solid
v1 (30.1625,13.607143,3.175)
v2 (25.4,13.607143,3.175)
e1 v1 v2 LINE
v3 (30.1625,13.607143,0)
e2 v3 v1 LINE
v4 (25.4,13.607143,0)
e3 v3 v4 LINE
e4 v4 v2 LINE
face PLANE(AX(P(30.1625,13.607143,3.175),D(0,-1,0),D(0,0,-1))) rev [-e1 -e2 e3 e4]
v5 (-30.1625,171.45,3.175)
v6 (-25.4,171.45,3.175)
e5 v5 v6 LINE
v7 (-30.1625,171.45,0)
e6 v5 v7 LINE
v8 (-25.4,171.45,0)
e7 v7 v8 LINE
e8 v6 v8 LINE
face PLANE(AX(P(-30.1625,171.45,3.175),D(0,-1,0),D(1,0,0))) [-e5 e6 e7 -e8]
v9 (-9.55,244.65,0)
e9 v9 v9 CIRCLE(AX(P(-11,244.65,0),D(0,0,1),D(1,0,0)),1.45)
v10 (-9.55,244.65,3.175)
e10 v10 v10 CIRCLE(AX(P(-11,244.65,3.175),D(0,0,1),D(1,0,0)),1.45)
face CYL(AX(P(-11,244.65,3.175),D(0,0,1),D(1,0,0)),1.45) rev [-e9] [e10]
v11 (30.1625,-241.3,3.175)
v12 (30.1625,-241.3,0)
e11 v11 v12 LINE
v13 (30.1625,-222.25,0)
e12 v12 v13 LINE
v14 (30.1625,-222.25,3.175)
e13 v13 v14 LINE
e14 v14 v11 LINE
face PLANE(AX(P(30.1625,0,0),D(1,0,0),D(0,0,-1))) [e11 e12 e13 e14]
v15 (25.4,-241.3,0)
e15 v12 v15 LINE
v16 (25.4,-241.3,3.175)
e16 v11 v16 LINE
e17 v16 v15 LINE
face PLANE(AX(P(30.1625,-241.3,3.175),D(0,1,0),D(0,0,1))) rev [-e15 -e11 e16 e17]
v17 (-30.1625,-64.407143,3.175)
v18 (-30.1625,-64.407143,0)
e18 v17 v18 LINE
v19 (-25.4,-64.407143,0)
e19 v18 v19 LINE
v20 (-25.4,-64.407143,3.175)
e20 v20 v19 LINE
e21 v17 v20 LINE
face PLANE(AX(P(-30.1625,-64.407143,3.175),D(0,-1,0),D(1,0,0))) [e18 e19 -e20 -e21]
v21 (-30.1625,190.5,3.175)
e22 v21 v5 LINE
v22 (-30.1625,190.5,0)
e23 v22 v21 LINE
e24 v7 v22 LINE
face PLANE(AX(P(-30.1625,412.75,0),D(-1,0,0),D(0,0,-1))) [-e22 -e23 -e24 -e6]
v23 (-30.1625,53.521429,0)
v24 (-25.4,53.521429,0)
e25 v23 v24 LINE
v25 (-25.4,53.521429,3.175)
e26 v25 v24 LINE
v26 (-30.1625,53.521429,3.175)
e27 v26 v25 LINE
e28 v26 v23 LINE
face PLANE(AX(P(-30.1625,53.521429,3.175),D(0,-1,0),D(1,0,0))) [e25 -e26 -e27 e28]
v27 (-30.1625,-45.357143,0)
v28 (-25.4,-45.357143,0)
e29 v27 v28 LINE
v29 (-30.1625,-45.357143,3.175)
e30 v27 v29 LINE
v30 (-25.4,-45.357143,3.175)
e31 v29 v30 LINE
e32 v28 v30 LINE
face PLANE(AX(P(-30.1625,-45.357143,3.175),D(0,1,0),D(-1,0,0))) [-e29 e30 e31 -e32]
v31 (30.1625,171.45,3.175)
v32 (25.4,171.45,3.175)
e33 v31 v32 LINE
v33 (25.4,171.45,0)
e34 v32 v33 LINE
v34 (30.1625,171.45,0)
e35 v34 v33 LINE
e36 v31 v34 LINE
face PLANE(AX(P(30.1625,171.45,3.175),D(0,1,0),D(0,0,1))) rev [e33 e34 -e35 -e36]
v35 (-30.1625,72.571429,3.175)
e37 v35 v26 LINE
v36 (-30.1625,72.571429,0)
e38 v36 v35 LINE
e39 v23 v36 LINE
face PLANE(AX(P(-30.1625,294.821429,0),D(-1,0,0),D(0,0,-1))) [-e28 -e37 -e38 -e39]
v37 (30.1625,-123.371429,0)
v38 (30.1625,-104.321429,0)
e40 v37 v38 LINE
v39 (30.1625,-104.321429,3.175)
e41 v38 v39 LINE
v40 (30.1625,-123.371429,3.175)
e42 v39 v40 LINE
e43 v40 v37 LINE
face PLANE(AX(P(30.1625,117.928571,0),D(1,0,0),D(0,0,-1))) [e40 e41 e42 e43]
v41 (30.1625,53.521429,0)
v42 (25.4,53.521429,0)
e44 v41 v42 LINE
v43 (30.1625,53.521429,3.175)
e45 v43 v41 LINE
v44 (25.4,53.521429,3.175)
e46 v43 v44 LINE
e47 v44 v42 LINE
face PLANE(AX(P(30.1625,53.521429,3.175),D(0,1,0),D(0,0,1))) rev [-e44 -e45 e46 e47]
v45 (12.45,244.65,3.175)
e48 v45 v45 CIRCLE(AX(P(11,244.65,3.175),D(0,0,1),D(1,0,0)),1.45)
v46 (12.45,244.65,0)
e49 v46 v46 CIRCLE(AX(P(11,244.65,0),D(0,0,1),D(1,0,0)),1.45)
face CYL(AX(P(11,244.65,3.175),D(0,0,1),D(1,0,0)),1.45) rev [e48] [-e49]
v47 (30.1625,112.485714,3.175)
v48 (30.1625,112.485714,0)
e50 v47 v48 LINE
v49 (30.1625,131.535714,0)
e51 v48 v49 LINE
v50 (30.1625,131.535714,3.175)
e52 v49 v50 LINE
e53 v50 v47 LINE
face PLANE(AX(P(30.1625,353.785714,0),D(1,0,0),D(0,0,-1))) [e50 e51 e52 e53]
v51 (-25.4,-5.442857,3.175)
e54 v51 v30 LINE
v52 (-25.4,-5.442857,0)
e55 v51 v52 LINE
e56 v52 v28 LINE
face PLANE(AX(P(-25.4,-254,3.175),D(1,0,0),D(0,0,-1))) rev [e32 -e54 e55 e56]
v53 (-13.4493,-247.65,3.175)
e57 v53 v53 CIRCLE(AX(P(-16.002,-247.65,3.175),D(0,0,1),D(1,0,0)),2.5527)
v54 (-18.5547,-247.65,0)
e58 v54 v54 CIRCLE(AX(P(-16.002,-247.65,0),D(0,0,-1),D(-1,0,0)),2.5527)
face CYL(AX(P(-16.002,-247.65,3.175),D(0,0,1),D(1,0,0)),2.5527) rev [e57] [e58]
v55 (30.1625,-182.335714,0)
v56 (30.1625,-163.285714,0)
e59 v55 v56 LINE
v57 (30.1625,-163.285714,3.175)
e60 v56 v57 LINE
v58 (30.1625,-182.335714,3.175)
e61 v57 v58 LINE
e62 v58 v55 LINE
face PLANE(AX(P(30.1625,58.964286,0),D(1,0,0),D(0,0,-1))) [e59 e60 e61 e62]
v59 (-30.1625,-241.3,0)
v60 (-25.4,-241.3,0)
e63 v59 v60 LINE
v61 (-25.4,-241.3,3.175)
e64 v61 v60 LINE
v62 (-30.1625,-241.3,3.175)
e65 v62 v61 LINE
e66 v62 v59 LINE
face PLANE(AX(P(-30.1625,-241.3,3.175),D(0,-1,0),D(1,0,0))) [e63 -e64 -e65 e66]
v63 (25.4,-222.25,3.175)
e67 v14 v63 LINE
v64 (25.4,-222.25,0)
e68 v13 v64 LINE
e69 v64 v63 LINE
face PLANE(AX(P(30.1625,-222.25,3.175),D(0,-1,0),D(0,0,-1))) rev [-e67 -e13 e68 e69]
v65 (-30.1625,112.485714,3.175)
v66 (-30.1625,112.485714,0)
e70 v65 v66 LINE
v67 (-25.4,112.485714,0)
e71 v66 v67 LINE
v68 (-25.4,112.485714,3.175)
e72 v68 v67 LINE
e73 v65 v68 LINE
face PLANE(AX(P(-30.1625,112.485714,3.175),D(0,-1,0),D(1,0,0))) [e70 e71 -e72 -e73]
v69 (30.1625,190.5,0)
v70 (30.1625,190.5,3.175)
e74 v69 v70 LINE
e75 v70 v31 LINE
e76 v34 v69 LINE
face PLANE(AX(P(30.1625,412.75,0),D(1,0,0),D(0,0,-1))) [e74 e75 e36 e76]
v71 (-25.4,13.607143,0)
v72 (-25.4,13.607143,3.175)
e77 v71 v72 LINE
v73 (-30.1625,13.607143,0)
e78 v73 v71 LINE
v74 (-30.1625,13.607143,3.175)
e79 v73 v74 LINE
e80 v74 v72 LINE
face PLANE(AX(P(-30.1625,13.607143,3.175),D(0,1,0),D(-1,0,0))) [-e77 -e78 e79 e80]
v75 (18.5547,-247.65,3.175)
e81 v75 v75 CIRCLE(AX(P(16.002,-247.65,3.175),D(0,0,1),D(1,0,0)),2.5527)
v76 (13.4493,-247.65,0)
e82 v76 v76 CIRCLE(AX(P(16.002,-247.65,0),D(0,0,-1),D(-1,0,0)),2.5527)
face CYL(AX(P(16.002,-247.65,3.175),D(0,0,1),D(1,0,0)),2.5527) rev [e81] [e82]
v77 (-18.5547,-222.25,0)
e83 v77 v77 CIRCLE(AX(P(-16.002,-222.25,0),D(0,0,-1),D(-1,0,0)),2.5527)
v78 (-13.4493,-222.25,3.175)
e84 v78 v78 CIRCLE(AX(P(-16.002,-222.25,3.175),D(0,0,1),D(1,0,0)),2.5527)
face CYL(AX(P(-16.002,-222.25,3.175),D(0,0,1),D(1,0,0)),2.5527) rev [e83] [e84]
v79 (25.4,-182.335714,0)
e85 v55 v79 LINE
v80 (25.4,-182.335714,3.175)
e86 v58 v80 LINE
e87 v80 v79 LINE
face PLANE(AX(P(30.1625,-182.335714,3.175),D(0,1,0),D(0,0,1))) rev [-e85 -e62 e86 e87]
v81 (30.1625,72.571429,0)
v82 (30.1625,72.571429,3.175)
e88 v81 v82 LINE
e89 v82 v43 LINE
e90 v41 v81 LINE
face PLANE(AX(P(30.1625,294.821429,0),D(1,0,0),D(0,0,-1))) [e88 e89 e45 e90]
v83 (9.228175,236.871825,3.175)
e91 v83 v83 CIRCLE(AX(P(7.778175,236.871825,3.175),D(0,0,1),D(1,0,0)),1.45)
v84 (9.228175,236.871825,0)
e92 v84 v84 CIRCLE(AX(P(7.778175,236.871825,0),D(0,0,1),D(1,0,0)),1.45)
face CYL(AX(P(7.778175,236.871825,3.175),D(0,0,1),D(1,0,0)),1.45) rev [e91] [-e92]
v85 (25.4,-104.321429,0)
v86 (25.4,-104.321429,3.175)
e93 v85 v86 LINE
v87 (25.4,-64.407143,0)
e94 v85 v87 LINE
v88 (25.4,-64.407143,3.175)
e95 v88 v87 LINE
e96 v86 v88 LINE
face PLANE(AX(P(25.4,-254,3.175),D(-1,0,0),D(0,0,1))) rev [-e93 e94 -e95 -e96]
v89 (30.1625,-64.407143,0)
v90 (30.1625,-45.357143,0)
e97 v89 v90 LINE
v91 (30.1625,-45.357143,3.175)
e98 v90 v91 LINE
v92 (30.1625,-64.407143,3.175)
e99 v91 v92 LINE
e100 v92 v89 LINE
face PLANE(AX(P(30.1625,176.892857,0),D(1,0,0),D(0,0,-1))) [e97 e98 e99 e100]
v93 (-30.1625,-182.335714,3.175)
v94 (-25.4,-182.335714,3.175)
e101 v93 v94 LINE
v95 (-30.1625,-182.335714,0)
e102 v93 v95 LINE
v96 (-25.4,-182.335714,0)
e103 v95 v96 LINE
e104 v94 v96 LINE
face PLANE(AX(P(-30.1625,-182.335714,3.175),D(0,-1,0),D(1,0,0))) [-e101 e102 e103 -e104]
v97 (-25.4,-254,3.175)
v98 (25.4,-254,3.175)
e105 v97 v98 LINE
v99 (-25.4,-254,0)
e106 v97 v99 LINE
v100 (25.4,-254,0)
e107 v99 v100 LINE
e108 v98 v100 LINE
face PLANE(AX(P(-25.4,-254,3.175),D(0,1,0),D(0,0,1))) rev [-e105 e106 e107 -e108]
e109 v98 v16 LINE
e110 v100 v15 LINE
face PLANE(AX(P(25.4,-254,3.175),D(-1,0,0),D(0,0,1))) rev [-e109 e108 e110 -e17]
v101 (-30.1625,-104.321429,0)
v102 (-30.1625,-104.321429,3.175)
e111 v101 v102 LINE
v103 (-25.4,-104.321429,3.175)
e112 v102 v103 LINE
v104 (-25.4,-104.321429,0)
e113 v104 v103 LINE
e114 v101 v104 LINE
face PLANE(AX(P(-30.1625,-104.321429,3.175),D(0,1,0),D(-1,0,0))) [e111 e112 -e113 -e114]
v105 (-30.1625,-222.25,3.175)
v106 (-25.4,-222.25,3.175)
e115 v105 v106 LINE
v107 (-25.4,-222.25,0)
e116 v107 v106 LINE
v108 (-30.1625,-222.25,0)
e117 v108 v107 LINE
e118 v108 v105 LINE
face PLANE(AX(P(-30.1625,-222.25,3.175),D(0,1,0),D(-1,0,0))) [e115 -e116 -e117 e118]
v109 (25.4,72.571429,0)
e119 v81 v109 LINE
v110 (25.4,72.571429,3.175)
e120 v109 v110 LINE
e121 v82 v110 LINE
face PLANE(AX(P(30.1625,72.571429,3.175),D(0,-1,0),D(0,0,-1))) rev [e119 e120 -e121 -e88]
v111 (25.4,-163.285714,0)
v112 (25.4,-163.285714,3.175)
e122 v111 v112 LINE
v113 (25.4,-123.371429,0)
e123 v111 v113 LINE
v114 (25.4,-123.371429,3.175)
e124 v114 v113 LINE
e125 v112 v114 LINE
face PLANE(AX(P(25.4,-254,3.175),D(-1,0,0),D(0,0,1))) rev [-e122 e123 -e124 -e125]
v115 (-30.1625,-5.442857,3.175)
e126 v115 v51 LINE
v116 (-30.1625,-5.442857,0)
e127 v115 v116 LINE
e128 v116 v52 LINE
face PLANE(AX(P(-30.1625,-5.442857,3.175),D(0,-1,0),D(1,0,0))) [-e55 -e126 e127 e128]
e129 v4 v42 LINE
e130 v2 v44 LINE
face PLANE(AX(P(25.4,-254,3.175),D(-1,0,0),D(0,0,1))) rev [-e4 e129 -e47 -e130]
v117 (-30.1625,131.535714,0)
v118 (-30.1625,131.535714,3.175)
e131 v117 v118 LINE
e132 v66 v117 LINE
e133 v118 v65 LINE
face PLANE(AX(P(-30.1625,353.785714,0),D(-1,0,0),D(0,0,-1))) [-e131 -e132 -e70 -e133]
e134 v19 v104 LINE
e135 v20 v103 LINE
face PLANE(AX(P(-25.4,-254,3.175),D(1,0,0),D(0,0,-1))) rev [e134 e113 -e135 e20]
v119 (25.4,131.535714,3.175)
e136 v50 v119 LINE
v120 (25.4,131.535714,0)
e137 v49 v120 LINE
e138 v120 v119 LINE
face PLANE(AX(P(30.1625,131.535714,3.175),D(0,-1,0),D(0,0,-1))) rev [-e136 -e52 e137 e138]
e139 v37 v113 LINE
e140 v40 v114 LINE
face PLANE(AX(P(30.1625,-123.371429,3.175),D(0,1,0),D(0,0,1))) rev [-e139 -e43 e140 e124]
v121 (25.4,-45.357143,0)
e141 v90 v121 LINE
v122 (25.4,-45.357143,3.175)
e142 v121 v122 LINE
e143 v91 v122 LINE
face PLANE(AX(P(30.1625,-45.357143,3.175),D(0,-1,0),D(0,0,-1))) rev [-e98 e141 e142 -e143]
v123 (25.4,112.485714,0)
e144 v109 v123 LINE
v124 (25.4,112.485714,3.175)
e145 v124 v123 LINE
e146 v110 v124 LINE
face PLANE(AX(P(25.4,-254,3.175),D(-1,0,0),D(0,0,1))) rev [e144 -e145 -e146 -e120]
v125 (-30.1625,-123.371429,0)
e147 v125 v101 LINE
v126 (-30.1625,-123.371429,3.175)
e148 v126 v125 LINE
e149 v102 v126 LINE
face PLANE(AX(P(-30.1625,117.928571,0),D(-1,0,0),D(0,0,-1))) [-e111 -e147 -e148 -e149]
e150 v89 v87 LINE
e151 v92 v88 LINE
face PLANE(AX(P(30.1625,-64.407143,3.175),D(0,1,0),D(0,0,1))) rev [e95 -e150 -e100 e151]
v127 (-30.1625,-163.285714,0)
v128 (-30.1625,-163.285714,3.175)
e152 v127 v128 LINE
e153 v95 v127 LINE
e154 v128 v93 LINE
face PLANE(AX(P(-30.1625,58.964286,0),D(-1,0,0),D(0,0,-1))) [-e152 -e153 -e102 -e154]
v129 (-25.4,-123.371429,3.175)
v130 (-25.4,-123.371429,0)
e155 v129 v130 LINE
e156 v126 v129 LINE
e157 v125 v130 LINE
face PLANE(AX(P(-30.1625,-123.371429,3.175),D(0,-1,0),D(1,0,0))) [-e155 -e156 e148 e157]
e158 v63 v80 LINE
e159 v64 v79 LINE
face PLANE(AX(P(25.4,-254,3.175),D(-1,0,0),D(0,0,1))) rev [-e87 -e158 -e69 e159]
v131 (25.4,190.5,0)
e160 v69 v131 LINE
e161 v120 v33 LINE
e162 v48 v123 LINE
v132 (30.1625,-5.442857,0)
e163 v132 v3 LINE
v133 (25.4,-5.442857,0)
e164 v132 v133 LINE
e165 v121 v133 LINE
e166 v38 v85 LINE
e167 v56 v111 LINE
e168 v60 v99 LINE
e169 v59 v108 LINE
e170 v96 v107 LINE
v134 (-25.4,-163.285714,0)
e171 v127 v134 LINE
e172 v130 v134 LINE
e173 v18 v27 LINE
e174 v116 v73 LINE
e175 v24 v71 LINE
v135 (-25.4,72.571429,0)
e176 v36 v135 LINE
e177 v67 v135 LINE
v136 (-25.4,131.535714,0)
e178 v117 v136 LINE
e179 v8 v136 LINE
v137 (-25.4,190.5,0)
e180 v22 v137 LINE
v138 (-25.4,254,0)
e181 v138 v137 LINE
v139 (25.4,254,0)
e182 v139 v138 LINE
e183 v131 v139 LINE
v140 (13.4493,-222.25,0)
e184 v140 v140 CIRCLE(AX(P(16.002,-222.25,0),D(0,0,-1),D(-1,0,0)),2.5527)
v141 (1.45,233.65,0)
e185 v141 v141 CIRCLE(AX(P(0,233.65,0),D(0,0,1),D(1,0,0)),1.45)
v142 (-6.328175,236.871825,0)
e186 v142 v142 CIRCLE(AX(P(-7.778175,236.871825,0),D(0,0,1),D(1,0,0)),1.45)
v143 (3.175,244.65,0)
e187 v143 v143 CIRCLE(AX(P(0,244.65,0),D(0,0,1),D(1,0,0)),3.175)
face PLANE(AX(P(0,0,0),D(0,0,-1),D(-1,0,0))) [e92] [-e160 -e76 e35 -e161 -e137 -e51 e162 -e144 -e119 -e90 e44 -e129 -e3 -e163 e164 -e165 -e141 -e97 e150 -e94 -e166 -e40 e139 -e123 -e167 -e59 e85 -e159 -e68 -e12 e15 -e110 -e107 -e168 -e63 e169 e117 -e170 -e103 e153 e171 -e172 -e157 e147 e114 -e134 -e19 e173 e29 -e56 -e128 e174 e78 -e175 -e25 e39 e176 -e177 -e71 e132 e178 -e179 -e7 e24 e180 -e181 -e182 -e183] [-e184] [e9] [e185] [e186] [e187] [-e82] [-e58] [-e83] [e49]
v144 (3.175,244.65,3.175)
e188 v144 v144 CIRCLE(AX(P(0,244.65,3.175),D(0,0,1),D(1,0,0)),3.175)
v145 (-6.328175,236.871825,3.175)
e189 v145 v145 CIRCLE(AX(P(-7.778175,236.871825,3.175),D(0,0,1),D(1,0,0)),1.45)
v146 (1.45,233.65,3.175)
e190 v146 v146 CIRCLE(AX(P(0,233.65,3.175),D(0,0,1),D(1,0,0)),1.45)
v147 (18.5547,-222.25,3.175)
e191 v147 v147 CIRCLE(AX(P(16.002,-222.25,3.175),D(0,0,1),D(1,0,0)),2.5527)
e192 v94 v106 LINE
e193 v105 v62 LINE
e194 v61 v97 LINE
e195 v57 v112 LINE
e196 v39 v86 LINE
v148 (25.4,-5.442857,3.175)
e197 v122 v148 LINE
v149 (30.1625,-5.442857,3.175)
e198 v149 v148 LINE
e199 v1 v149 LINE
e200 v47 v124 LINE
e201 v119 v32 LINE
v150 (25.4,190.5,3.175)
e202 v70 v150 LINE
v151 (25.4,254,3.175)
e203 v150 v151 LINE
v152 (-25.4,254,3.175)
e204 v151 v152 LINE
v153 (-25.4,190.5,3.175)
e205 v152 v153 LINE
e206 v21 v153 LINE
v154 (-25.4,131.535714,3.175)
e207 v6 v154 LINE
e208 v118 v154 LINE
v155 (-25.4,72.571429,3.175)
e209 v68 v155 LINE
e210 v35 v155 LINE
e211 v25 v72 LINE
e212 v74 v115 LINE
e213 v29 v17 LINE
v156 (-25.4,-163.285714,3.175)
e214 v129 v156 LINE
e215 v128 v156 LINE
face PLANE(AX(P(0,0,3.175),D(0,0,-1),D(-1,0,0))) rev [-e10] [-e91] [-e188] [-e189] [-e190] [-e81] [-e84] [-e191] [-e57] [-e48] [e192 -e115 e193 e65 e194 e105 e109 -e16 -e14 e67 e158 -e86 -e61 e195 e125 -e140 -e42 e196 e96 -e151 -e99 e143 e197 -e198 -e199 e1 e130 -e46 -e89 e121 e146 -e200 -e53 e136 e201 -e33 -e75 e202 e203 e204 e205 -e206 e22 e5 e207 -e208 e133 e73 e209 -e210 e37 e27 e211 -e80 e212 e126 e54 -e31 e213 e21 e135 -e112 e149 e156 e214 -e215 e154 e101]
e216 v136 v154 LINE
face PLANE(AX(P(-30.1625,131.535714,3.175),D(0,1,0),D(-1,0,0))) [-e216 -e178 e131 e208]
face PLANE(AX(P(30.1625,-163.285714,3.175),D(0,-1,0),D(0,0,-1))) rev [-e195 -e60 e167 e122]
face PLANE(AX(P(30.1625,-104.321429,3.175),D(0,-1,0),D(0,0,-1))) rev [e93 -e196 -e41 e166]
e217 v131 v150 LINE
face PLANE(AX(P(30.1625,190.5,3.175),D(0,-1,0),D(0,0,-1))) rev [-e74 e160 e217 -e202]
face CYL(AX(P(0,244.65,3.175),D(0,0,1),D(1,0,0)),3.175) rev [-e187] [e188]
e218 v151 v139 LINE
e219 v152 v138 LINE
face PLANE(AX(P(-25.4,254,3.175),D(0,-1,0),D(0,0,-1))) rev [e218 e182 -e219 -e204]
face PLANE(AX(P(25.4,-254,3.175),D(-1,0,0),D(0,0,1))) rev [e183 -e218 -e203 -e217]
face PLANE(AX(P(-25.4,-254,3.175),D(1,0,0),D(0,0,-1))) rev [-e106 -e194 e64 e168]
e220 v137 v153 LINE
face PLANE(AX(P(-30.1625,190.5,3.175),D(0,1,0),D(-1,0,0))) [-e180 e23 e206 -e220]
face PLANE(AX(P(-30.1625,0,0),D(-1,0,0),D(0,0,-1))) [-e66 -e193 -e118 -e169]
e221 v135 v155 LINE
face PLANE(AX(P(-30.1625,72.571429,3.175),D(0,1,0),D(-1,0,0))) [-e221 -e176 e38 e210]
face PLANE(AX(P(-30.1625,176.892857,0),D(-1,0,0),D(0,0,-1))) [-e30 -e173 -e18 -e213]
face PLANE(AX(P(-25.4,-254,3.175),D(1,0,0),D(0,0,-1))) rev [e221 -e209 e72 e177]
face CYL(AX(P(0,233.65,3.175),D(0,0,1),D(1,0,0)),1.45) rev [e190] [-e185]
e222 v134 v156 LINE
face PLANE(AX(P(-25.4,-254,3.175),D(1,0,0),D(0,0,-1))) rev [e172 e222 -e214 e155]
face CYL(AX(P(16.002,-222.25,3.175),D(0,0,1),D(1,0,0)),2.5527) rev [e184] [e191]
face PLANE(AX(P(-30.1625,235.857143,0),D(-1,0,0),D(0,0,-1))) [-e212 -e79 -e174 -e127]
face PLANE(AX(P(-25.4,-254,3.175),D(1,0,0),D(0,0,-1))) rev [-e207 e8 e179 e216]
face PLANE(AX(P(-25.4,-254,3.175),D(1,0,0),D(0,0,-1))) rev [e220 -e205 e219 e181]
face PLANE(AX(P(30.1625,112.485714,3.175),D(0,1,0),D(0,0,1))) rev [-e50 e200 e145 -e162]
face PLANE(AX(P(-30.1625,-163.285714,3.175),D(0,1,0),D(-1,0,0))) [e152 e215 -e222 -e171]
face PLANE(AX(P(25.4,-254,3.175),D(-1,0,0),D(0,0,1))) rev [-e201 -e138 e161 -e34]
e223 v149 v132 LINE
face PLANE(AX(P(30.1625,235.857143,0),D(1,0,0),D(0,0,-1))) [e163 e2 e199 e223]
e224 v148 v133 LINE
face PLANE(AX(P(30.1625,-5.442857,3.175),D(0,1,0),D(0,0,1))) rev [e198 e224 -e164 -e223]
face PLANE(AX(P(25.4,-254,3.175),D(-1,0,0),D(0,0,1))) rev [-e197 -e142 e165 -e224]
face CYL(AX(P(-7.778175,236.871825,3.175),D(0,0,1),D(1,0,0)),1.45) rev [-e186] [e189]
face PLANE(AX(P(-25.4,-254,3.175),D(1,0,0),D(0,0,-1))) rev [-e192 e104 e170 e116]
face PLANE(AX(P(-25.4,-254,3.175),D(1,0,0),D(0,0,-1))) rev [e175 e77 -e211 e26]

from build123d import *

# Parameters (mm, degrees)
SKETCH1_W                   = 50.8
SKETCH1_H                   = 508
BOSS_EXTRUDE1_DEPTH         = 3.175
M2_5_CLEARANCE_HOLE1_D      = 2.9
F_1_4_0_25_DIAMETER_HOLE1_D = 6.35
SKETCH6_W                   = 3.175
SKETCH6_H                   = 19.05
BOSS_EXTRUDE2_DEPTH         = 4.7625
CRVPATTERN1_START           = 25.4
CRVPATTERN1_OUTLINE_W       = 19.05
CRVPATTERN1_OUTLINE_H       = 3.175
CRVPATTERN1_DEPTH           = 4.7625
F_10_CLEARANCE_HOLE1_D      = 5.1054


# Read off the part's stored shape, not the designer's step: CrvPattern1
with BuildPart() as part:
    # Sketch1 → Boss-Extrude1 (new body)
    with BuildSketch(Plane.XY):
        Rectangle(SKETCH1_W, SKETCH1_H)
    extrude(amount=BOSS_EXTRUDE1_DEPTH)

    # M2.5 Clearance Hole1 (through all)
    with Locations(Plane.XY.offset(3.175)):
        with Locations((-11, 244.65), (-7.778174593, 236.871825407), (0, 233.65), (7.778174593, 236.871825407), (11, 244.65)):
            Hole(M2_5_CLEARANCE_HOLE1_D / 2)

    # 1/4 (0.25) Diameter Hole1 (through all)
    with Locations(Plane.XY.offset(3.175)):
        with Locations((0, 244.65)):
            Hole(F_1_4_0_25_DIAMETER_HOLE1_D / 2)

    # Sketch6 → Boss-Extrude2 (add)
    with BuildSketch(Plane(origin=(25.4, 0, 0), x_dir=(0, 0, -1), z_dir=(1, 0, 0))):
        with Locations((-1.5875, -231.775)):
            Rectangle(SKETCH6_W, SKETCH6_H)
    boss_extrude2 = extrude(amount=BOSS_EXTRUDE2_DEPTH)

    # CrvPattern1 outline → CrvPattern1 (add)
    with BuildSketch(Plane.YZ.offset(CRVPATTERN1_START)):
        with Locations((-172.810714286, 1.5875)):
            Rectangle(CRVPATTERN1_OUTLINE_W, CRVPATTERN1_OUTLINE_H)
        with Locations((-113.846428571, 1.5875)):
            Rectangle(CRVPATTERN1_OUTLINE_W, CRVPATTERN1_OUTLINE_H)
        with Locations((-54.882142857, 1.5875)):
            Rectangle(CRVPATTERN1_OUTLINE_W, CRVPATTERN1_OUTLINE_H)
        with Locations((4.082142857, 1.5875)):
            Rectangle(CRVPATTERN1_OUTLINE_W, CRVPATTERN1_OUTLINE_H)
        with Locations((63.046428571, 1.5875)):
            Rectangle(CRVPATTERN1_OUTLINE_W, CRVPATTERN1_OUTLINE_H)
        with Locations((122.010714286, 1.5875)):
            Rectangle(CRVPATTERN1_OUTLINE_W, CRVPATTERN1_OUTLINE_H)
        with Locations((180.975, 1.5875)):
            Rectangle(CRVPATTERN1_OUTLINE_W, CRVPATTERN1_OUTLINE_H)
    crvpattern1 = extrude(amount=CRVPATTERN1_DEPTH)

    # Mirror1: Boss-Extrude2, CrvPattern1 across plane
    add(boss_extrude2.mirror(Plane.ZY))
    add(crvpattern1.mirror(Plane.ZY))

    # #10 Clearance Hole1 (through all)
    with Locations(Plane.XY.offset(3.175)):
        with Locations((16.002, -247.65), (-16.002, -247.65), (16.002, -222.25), (-16.002, -222.25)):
            Hole(F_10_CLEARANCE_HOLE1_D / 2)


solid = part.part
